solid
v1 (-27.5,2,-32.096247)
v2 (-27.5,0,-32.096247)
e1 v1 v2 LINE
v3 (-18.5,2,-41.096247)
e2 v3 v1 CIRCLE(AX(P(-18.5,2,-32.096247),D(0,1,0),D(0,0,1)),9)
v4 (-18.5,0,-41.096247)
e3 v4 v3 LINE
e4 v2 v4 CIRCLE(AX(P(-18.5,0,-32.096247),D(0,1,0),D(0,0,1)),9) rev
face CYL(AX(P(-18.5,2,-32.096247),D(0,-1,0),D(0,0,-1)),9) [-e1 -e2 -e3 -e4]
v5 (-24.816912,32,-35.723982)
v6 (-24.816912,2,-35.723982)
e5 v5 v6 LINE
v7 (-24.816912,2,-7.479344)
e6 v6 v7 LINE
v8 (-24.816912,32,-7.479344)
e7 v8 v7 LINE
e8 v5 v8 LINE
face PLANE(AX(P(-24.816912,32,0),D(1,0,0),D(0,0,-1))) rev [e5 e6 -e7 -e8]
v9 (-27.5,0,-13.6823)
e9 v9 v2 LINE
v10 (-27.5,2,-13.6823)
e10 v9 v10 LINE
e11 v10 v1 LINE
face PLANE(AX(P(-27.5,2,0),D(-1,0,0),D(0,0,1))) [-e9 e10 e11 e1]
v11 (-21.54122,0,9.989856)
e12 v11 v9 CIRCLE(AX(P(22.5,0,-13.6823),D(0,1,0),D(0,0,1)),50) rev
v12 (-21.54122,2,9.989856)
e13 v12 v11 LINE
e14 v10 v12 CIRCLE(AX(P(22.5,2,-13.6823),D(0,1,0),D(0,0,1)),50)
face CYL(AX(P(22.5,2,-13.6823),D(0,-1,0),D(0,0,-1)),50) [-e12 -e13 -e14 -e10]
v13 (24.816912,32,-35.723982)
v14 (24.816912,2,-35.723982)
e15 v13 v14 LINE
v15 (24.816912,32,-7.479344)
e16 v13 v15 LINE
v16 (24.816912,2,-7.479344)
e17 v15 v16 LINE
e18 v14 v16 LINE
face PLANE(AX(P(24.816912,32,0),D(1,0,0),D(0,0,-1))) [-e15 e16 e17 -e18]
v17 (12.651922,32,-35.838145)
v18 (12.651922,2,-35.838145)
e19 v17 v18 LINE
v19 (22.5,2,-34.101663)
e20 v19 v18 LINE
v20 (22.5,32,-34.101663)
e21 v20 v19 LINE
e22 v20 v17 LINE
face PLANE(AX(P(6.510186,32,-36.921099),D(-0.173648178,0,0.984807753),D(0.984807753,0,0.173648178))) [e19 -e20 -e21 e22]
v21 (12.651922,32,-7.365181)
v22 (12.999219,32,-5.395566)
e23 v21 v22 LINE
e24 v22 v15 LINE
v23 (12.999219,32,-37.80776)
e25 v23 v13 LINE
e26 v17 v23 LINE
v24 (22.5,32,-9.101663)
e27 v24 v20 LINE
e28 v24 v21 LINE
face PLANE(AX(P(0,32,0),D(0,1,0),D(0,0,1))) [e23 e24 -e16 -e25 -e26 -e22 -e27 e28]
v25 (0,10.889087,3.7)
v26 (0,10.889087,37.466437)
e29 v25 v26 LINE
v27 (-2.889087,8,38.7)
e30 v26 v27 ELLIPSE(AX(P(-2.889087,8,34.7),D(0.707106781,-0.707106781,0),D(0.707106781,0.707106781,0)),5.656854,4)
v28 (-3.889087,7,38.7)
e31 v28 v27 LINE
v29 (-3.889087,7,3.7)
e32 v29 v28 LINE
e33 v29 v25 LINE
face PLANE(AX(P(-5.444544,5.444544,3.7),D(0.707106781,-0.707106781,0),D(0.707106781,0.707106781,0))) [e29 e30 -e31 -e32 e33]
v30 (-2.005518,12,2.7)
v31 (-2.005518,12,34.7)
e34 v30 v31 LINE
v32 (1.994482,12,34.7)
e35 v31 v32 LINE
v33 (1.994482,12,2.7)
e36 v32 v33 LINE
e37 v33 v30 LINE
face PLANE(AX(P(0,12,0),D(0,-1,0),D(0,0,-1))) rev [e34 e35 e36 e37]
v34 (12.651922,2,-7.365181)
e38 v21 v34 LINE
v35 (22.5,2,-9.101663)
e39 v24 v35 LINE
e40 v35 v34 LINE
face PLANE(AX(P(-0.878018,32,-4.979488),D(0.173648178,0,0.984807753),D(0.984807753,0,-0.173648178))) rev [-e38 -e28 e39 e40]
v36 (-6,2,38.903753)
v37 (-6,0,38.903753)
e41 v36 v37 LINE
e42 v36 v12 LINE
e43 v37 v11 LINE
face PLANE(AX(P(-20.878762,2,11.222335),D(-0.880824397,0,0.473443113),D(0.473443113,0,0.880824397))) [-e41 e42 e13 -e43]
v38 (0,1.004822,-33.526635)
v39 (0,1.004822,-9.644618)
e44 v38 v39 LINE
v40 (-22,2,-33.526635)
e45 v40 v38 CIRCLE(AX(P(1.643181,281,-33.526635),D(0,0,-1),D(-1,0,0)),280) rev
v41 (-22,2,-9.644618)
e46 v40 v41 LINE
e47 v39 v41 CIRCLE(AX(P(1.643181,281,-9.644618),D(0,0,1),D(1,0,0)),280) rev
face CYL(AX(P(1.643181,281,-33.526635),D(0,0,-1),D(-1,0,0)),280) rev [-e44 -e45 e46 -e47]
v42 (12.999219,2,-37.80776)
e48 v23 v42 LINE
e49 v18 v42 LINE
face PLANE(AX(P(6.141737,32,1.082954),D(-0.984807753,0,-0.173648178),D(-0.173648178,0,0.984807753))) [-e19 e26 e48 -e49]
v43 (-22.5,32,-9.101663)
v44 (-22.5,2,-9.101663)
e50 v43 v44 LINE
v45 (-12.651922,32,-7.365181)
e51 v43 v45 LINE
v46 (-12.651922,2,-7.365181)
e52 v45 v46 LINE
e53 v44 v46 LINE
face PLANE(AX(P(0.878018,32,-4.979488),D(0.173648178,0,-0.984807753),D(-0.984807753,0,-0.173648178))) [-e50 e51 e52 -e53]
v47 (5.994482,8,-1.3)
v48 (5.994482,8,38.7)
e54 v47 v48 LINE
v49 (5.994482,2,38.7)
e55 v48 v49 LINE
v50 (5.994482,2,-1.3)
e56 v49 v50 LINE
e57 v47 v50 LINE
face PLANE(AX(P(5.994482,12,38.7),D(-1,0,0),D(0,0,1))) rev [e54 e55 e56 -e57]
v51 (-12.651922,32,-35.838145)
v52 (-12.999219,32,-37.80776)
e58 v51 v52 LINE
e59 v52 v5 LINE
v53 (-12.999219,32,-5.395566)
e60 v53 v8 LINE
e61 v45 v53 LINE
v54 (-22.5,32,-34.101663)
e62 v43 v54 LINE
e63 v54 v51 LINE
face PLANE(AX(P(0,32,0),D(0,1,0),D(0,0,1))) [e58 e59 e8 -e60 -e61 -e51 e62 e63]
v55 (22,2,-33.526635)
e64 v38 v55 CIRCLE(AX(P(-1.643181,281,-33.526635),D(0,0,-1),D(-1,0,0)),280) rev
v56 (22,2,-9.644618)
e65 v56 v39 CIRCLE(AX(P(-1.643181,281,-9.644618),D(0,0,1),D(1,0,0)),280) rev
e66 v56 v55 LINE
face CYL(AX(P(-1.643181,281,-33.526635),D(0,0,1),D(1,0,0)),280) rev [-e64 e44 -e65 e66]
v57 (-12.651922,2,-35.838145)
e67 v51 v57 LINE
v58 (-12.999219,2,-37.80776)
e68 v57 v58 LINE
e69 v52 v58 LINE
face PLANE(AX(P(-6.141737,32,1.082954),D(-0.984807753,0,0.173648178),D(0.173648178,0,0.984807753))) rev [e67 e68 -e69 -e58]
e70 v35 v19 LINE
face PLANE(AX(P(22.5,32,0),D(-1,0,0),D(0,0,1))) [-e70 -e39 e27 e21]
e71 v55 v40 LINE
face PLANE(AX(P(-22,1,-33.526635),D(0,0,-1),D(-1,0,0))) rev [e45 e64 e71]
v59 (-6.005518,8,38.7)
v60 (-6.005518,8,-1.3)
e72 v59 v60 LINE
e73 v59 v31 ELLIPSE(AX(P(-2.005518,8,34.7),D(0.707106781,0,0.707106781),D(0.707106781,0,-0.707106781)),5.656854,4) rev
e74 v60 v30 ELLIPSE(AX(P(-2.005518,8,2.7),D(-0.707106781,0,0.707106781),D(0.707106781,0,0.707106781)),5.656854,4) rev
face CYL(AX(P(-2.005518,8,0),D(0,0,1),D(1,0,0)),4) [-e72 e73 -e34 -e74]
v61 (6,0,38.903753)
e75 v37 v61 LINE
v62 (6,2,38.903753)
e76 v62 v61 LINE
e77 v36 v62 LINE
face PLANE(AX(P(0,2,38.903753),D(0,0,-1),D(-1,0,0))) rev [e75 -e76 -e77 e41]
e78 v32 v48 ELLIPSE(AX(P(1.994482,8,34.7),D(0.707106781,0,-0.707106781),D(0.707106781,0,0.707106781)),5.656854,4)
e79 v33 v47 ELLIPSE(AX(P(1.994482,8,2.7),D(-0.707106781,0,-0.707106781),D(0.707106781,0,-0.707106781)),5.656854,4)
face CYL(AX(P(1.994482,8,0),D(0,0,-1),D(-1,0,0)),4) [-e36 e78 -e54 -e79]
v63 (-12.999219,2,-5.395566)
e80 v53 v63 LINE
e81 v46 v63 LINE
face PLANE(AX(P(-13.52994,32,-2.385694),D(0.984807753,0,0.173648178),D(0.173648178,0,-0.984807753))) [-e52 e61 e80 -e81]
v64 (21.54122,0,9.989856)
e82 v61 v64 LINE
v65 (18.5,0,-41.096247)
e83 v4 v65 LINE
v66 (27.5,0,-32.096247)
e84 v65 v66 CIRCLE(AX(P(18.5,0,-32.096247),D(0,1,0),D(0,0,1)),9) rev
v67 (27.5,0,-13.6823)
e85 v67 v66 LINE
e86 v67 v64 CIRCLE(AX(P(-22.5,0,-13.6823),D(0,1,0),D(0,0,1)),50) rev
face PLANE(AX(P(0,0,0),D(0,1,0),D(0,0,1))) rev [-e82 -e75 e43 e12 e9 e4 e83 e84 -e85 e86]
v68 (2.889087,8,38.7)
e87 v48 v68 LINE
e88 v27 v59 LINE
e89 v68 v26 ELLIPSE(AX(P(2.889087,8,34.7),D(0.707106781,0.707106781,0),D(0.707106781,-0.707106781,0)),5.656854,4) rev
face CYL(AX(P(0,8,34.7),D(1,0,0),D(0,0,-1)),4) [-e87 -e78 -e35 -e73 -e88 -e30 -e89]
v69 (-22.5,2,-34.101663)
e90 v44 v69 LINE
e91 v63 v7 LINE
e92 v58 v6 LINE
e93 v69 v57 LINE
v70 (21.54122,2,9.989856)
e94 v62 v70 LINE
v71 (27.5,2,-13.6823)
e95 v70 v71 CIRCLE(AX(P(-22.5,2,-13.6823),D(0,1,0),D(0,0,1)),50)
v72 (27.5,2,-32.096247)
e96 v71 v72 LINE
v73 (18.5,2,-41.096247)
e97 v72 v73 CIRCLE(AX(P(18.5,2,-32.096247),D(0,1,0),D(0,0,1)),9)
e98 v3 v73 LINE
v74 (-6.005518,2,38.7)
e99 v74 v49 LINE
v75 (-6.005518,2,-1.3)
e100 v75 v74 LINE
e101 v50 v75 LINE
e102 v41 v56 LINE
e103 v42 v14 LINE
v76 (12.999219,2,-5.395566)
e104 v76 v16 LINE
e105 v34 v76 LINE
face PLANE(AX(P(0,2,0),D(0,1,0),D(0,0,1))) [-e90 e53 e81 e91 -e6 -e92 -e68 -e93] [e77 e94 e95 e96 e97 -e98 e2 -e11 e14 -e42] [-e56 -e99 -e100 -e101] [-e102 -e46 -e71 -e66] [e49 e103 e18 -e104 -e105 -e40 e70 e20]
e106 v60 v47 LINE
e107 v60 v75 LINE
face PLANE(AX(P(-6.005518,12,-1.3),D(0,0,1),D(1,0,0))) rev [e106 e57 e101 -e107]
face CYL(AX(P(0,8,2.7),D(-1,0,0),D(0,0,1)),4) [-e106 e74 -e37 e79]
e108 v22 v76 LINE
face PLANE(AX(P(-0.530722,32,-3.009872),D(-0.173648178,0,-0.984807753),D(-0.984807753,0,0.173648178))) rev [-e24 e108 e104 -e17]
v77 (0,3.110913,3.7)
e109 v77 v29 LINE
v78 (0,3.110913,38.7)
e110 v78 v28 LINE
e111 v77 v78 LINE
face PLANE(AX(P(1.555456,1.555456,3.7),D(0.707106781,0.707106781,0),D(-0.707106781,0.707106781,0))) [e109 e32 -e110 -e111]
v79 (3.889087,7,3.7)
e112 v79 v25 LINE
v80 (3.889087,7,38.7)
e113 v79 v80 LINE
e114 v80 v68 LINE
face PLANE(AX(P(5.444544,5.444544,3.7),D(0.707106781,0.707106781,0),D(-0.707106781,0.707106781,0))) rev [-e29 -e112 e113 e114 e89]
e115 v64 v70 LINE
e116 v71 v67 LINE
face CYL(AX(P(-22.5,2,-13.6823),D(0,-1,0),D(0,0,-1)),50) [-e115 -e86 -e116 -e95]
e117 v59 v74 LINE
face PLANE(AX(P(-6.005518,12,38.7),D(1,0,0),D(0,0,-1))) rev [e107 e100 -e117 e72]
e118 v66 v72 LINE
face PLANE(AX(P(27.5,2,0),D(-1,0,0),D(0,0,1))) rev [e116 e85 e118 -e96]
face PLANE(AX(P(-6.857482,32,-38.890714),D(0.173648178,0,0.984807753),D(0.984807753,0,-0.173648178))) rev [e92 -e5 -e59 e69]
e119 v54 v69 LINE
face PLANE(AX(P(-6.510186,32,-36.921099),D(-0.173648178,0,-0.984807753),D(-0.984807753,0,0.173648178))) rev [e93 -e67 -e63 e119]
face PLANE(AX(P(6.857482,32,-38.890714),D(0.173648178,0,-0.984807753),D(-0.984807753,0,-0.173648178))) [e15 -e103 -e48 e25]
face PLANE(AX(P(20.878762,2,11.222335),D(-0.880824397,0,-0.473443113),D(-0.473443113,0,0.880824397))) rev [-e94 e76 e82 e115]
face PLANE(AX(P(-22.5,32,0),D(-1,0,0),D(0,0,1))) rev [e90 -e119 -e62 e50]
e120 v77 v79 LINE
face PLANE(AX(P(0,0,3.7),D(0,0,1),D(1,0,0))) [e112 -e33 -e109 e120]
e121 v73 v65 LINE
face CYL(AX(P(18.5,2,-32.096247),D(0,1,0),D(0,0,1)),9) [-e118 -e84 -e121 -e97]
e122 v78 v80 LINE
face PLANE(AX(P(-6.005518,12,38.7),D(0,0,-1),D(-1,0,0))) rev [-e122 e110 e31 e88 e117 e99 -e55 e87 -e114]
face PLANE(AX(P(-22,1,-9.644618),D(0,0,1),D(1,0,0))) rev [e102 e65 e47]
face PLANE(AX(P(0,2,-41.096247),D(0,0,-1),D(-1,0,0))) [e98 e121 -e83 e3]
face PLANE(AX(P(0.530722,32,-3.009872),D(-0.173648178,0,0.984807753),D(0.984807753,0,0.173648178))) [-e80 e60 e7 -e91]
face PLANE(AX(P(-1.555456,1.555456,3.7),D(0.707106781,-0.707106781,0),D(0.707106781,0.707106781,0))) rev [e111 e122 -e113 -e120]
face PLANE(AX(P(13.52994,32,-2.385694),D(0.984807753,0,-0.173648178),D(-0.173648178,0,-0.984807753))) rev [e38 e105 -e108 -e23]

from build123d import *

# Parameters (mm, degrees)
BOSS_EXTRUDE1_DEPTH = 2
BOSS_EXTRUDE2_DEPTH = 30
SKETCH3_W           = 12
SKETCH3_H           = 40
BOSS_EXTRUDE3_DEPTH = 10
CUT_EXTRUDE1_DEPTH  = 35
SKETCH6_W           = 44
SKETCH6_H           = 23.882016553
CUT_EXTRUDE2_DEPTH  = 1
FILLET1_R           = 280
FILLET2_R           = 9
FILLET3_R           = 4
FILLET4_R           = 50


with BuildPart() as part:
    # Sketch1 → Boss-Extrude1 (new body)
    with BuildSketch(Plane(origin=(0, 0, 0), x_dir=(1, 0, 0), z_dir=(0, 1, 0))):
        Polygon((-27.5, 1.096246938), (-6, -38.903753062), (6, -38.903753062), (27.5, 1.096246938), (27.5, 41.096246938), (-27.5, 41.096246938), align=None)
    extrude(amount=BOSS_EXTRUDE1_DEPTH)

    # Sketch2 → Boss-Extrude2 (add)
    with BuildSketch(Plane(origin=(0, 2, 0), x_dir=(1, 0, 0), z_dir=(0, 1, 0))):
        Polygon((-22.5, 9.101662984), (-22.5, 34.101662984), (-12.65192247, 35.838144761), (-12.999218825, 37.807760267), (-24.816911861, 35.723982135), (-24.816911861, 7.479343833), (-12.999218825, 5.395565701), (-12.65192247, 7.365181207), align=None)
        Polygon((12.65192247, 7.365181207), (12.999218825, 5.395565701), (24.816911861, 7.479343833), (24.816911861, 35.723982135), (12.999218825, 37.807760267), (12.65192247, 35.838144761), (22.5, 34.101662984), (22.5, 9.101662984), align=None)
    extrude(amount=BOSS_EXTRUDE2_DEPTH)

    # Sketch3 → Boss-Extrude3 (add)
    with BuildSketch(Plane(origin=(0, 2, 0), x_dir=(1, 0, 0), z_dir=(0, 1, 0))):
        with Locations((-0.005517933, -18.7)):
            Rectangle(SKETCH3_W, SKETCH3_H)
    extrude(amount=BOSS_EXTRUDE3_DEPTH)

    # Sketch4 → Cut-Extrude1 (cut)
    with BuildSketch(Plane.XY.offset(38.7)):
        Polygon((0, 3.110912703), (3.889087297, 7), (0, 10.889087297), (-3.889087297, 7), align=None)
    extrude(amount=-CUT_EXTRUDE1_DEPTH, mode=Mode.SUBTRACT)

    # Sketch6 → Cut-Extrude2 (cut)
    with BuildSketch(Plane(origin=(0, 2, 0), x_dir=(1, 0, 0), z_dir=(0, 1, 0))):
        with Locations((0, 21.585626422)):
            Rectangle(SKETCH6_W, SKETCH6_H)
    extrude(amount=-CUT_EXTRUDE2_DEPTH, mode=Mode.SUBTRACT)

    # Fillet1
    # the kernel refuses this fillet: 280 mm, written as the material it adds along each edge
    with BuildSketch(Plane(origin=(22, 1, -92.634586786), x_dir=(0, 1, 0), z_dir=(0, 0, 1))) as fillet1_piece_1_section:
        with BuildLine():
            CenterArc((280, 23.643180835), FILLET1_R, 180, 4.843819526)
            Line((0, 23.643180835), (0, 0))
            Line((0, 0), (1, 0))
        make_face()
    fillet1_piece_1 = extrude(amount=142.097920729, mode=Mode.PRIVATE)
    fillet1_piece_1 = split(fillet1_piece_1, bisect_by=Plane(origin=(13.044676358, 1.194161729, -5.403581091), z_dir=(-0.17364817766692942, 0, -0.9848077530122082)), keep=Keep.TOP, mode=Mode.PRIVATE)
    fillet1_piece_1 = split(fillet1_piece_1, bisect_by=Plane(origin=(13.050161185, 1.194161729, -37.798777754), z_dir=(-0.1736481776669295, 0, 0.9848077530122082)), keep=Keep.TOP, mode=Mode.PRIVATE)
    add(fillet1_piece_1)
    with BuildSketch(Plane(origin=(-22, 1, -9.644618145), x_dir=(0, 1, 0), z_dir=(0, 0, -1))) as fillet1_piece_2:
        with BuildLine():
            CenterArc((280, 23.643180835), FILLET1_R, 180, 4.843819526)
            Line((0, 23.643180835), (0, 0))
            Line((0, 0), (1, 0))
        make_face()
    extrude(amount=23.882016554)

    # Fillet2
    fillet2_edges = [part.edges().sort_by_distance(p)[0] for p in [
        (-27.5, 1, -41.096246938),
        (27.5, 1, -41.096246938),
    ]]
    fillet(fillet2_edges, radius=FILLET2_R)

    # Fillet3
    # the kernel refuses this fillet: 4 mm, written as the material it takes off along each edge
    with BuildSketch(Plane(origin=(5.994482067, 12, 48.7), x_dir=(0, -1, 0), z_dir=(0, 0, -1)), Plane(origin=(-6.005517933, 12, -11.3), x_dir=(0, -1, 0), z_dir=(0, 0, 1))) as fillet3_piece_1:
        with BuildLine():
            CenterArc((FILLET3_R, FILLET3_R), FILLET3_R, 180, 90)
            Line((0, FILLET3_R), (0, 0))
            Line((0, 0), (FILLET3_R, 0))
        make_face()
    extrude(amount=60, mode=Mode.SUBTRACT)
    with BuildSketch(Plane(origin=(15.994482067, 12, -1.3), x_dir=(0, -1, 0), z_dir=(-1, 0, 0)), Plane(origin=(-16.005517933, 12, 38.7), x_dir=(0, -1, 0), z_dir=(1, 0, 0))) as fillet3_piece_2:
        with BuildLine():
            CenterArc((FILLET3_R, FILLET3_R), FILLET3_R, 180, 90)
            Line((0, FILLET3_R), (0, 0))
            Line((0, 0), (FILLET3_R, 0))
        make_face()
    extrude(amount=32, mode=Mode.SUBTRACT)

    # Fillet4
    fillet4_edges = [part.edges().sort_by_distance(p)[0] for p in [
        (-27.5, 1, -1.096246938),
        (27.5, 1, -1.096246938),
    ]]
    fillet(fillet4_edges, radius=FILLET4_R)


solid = part.part
